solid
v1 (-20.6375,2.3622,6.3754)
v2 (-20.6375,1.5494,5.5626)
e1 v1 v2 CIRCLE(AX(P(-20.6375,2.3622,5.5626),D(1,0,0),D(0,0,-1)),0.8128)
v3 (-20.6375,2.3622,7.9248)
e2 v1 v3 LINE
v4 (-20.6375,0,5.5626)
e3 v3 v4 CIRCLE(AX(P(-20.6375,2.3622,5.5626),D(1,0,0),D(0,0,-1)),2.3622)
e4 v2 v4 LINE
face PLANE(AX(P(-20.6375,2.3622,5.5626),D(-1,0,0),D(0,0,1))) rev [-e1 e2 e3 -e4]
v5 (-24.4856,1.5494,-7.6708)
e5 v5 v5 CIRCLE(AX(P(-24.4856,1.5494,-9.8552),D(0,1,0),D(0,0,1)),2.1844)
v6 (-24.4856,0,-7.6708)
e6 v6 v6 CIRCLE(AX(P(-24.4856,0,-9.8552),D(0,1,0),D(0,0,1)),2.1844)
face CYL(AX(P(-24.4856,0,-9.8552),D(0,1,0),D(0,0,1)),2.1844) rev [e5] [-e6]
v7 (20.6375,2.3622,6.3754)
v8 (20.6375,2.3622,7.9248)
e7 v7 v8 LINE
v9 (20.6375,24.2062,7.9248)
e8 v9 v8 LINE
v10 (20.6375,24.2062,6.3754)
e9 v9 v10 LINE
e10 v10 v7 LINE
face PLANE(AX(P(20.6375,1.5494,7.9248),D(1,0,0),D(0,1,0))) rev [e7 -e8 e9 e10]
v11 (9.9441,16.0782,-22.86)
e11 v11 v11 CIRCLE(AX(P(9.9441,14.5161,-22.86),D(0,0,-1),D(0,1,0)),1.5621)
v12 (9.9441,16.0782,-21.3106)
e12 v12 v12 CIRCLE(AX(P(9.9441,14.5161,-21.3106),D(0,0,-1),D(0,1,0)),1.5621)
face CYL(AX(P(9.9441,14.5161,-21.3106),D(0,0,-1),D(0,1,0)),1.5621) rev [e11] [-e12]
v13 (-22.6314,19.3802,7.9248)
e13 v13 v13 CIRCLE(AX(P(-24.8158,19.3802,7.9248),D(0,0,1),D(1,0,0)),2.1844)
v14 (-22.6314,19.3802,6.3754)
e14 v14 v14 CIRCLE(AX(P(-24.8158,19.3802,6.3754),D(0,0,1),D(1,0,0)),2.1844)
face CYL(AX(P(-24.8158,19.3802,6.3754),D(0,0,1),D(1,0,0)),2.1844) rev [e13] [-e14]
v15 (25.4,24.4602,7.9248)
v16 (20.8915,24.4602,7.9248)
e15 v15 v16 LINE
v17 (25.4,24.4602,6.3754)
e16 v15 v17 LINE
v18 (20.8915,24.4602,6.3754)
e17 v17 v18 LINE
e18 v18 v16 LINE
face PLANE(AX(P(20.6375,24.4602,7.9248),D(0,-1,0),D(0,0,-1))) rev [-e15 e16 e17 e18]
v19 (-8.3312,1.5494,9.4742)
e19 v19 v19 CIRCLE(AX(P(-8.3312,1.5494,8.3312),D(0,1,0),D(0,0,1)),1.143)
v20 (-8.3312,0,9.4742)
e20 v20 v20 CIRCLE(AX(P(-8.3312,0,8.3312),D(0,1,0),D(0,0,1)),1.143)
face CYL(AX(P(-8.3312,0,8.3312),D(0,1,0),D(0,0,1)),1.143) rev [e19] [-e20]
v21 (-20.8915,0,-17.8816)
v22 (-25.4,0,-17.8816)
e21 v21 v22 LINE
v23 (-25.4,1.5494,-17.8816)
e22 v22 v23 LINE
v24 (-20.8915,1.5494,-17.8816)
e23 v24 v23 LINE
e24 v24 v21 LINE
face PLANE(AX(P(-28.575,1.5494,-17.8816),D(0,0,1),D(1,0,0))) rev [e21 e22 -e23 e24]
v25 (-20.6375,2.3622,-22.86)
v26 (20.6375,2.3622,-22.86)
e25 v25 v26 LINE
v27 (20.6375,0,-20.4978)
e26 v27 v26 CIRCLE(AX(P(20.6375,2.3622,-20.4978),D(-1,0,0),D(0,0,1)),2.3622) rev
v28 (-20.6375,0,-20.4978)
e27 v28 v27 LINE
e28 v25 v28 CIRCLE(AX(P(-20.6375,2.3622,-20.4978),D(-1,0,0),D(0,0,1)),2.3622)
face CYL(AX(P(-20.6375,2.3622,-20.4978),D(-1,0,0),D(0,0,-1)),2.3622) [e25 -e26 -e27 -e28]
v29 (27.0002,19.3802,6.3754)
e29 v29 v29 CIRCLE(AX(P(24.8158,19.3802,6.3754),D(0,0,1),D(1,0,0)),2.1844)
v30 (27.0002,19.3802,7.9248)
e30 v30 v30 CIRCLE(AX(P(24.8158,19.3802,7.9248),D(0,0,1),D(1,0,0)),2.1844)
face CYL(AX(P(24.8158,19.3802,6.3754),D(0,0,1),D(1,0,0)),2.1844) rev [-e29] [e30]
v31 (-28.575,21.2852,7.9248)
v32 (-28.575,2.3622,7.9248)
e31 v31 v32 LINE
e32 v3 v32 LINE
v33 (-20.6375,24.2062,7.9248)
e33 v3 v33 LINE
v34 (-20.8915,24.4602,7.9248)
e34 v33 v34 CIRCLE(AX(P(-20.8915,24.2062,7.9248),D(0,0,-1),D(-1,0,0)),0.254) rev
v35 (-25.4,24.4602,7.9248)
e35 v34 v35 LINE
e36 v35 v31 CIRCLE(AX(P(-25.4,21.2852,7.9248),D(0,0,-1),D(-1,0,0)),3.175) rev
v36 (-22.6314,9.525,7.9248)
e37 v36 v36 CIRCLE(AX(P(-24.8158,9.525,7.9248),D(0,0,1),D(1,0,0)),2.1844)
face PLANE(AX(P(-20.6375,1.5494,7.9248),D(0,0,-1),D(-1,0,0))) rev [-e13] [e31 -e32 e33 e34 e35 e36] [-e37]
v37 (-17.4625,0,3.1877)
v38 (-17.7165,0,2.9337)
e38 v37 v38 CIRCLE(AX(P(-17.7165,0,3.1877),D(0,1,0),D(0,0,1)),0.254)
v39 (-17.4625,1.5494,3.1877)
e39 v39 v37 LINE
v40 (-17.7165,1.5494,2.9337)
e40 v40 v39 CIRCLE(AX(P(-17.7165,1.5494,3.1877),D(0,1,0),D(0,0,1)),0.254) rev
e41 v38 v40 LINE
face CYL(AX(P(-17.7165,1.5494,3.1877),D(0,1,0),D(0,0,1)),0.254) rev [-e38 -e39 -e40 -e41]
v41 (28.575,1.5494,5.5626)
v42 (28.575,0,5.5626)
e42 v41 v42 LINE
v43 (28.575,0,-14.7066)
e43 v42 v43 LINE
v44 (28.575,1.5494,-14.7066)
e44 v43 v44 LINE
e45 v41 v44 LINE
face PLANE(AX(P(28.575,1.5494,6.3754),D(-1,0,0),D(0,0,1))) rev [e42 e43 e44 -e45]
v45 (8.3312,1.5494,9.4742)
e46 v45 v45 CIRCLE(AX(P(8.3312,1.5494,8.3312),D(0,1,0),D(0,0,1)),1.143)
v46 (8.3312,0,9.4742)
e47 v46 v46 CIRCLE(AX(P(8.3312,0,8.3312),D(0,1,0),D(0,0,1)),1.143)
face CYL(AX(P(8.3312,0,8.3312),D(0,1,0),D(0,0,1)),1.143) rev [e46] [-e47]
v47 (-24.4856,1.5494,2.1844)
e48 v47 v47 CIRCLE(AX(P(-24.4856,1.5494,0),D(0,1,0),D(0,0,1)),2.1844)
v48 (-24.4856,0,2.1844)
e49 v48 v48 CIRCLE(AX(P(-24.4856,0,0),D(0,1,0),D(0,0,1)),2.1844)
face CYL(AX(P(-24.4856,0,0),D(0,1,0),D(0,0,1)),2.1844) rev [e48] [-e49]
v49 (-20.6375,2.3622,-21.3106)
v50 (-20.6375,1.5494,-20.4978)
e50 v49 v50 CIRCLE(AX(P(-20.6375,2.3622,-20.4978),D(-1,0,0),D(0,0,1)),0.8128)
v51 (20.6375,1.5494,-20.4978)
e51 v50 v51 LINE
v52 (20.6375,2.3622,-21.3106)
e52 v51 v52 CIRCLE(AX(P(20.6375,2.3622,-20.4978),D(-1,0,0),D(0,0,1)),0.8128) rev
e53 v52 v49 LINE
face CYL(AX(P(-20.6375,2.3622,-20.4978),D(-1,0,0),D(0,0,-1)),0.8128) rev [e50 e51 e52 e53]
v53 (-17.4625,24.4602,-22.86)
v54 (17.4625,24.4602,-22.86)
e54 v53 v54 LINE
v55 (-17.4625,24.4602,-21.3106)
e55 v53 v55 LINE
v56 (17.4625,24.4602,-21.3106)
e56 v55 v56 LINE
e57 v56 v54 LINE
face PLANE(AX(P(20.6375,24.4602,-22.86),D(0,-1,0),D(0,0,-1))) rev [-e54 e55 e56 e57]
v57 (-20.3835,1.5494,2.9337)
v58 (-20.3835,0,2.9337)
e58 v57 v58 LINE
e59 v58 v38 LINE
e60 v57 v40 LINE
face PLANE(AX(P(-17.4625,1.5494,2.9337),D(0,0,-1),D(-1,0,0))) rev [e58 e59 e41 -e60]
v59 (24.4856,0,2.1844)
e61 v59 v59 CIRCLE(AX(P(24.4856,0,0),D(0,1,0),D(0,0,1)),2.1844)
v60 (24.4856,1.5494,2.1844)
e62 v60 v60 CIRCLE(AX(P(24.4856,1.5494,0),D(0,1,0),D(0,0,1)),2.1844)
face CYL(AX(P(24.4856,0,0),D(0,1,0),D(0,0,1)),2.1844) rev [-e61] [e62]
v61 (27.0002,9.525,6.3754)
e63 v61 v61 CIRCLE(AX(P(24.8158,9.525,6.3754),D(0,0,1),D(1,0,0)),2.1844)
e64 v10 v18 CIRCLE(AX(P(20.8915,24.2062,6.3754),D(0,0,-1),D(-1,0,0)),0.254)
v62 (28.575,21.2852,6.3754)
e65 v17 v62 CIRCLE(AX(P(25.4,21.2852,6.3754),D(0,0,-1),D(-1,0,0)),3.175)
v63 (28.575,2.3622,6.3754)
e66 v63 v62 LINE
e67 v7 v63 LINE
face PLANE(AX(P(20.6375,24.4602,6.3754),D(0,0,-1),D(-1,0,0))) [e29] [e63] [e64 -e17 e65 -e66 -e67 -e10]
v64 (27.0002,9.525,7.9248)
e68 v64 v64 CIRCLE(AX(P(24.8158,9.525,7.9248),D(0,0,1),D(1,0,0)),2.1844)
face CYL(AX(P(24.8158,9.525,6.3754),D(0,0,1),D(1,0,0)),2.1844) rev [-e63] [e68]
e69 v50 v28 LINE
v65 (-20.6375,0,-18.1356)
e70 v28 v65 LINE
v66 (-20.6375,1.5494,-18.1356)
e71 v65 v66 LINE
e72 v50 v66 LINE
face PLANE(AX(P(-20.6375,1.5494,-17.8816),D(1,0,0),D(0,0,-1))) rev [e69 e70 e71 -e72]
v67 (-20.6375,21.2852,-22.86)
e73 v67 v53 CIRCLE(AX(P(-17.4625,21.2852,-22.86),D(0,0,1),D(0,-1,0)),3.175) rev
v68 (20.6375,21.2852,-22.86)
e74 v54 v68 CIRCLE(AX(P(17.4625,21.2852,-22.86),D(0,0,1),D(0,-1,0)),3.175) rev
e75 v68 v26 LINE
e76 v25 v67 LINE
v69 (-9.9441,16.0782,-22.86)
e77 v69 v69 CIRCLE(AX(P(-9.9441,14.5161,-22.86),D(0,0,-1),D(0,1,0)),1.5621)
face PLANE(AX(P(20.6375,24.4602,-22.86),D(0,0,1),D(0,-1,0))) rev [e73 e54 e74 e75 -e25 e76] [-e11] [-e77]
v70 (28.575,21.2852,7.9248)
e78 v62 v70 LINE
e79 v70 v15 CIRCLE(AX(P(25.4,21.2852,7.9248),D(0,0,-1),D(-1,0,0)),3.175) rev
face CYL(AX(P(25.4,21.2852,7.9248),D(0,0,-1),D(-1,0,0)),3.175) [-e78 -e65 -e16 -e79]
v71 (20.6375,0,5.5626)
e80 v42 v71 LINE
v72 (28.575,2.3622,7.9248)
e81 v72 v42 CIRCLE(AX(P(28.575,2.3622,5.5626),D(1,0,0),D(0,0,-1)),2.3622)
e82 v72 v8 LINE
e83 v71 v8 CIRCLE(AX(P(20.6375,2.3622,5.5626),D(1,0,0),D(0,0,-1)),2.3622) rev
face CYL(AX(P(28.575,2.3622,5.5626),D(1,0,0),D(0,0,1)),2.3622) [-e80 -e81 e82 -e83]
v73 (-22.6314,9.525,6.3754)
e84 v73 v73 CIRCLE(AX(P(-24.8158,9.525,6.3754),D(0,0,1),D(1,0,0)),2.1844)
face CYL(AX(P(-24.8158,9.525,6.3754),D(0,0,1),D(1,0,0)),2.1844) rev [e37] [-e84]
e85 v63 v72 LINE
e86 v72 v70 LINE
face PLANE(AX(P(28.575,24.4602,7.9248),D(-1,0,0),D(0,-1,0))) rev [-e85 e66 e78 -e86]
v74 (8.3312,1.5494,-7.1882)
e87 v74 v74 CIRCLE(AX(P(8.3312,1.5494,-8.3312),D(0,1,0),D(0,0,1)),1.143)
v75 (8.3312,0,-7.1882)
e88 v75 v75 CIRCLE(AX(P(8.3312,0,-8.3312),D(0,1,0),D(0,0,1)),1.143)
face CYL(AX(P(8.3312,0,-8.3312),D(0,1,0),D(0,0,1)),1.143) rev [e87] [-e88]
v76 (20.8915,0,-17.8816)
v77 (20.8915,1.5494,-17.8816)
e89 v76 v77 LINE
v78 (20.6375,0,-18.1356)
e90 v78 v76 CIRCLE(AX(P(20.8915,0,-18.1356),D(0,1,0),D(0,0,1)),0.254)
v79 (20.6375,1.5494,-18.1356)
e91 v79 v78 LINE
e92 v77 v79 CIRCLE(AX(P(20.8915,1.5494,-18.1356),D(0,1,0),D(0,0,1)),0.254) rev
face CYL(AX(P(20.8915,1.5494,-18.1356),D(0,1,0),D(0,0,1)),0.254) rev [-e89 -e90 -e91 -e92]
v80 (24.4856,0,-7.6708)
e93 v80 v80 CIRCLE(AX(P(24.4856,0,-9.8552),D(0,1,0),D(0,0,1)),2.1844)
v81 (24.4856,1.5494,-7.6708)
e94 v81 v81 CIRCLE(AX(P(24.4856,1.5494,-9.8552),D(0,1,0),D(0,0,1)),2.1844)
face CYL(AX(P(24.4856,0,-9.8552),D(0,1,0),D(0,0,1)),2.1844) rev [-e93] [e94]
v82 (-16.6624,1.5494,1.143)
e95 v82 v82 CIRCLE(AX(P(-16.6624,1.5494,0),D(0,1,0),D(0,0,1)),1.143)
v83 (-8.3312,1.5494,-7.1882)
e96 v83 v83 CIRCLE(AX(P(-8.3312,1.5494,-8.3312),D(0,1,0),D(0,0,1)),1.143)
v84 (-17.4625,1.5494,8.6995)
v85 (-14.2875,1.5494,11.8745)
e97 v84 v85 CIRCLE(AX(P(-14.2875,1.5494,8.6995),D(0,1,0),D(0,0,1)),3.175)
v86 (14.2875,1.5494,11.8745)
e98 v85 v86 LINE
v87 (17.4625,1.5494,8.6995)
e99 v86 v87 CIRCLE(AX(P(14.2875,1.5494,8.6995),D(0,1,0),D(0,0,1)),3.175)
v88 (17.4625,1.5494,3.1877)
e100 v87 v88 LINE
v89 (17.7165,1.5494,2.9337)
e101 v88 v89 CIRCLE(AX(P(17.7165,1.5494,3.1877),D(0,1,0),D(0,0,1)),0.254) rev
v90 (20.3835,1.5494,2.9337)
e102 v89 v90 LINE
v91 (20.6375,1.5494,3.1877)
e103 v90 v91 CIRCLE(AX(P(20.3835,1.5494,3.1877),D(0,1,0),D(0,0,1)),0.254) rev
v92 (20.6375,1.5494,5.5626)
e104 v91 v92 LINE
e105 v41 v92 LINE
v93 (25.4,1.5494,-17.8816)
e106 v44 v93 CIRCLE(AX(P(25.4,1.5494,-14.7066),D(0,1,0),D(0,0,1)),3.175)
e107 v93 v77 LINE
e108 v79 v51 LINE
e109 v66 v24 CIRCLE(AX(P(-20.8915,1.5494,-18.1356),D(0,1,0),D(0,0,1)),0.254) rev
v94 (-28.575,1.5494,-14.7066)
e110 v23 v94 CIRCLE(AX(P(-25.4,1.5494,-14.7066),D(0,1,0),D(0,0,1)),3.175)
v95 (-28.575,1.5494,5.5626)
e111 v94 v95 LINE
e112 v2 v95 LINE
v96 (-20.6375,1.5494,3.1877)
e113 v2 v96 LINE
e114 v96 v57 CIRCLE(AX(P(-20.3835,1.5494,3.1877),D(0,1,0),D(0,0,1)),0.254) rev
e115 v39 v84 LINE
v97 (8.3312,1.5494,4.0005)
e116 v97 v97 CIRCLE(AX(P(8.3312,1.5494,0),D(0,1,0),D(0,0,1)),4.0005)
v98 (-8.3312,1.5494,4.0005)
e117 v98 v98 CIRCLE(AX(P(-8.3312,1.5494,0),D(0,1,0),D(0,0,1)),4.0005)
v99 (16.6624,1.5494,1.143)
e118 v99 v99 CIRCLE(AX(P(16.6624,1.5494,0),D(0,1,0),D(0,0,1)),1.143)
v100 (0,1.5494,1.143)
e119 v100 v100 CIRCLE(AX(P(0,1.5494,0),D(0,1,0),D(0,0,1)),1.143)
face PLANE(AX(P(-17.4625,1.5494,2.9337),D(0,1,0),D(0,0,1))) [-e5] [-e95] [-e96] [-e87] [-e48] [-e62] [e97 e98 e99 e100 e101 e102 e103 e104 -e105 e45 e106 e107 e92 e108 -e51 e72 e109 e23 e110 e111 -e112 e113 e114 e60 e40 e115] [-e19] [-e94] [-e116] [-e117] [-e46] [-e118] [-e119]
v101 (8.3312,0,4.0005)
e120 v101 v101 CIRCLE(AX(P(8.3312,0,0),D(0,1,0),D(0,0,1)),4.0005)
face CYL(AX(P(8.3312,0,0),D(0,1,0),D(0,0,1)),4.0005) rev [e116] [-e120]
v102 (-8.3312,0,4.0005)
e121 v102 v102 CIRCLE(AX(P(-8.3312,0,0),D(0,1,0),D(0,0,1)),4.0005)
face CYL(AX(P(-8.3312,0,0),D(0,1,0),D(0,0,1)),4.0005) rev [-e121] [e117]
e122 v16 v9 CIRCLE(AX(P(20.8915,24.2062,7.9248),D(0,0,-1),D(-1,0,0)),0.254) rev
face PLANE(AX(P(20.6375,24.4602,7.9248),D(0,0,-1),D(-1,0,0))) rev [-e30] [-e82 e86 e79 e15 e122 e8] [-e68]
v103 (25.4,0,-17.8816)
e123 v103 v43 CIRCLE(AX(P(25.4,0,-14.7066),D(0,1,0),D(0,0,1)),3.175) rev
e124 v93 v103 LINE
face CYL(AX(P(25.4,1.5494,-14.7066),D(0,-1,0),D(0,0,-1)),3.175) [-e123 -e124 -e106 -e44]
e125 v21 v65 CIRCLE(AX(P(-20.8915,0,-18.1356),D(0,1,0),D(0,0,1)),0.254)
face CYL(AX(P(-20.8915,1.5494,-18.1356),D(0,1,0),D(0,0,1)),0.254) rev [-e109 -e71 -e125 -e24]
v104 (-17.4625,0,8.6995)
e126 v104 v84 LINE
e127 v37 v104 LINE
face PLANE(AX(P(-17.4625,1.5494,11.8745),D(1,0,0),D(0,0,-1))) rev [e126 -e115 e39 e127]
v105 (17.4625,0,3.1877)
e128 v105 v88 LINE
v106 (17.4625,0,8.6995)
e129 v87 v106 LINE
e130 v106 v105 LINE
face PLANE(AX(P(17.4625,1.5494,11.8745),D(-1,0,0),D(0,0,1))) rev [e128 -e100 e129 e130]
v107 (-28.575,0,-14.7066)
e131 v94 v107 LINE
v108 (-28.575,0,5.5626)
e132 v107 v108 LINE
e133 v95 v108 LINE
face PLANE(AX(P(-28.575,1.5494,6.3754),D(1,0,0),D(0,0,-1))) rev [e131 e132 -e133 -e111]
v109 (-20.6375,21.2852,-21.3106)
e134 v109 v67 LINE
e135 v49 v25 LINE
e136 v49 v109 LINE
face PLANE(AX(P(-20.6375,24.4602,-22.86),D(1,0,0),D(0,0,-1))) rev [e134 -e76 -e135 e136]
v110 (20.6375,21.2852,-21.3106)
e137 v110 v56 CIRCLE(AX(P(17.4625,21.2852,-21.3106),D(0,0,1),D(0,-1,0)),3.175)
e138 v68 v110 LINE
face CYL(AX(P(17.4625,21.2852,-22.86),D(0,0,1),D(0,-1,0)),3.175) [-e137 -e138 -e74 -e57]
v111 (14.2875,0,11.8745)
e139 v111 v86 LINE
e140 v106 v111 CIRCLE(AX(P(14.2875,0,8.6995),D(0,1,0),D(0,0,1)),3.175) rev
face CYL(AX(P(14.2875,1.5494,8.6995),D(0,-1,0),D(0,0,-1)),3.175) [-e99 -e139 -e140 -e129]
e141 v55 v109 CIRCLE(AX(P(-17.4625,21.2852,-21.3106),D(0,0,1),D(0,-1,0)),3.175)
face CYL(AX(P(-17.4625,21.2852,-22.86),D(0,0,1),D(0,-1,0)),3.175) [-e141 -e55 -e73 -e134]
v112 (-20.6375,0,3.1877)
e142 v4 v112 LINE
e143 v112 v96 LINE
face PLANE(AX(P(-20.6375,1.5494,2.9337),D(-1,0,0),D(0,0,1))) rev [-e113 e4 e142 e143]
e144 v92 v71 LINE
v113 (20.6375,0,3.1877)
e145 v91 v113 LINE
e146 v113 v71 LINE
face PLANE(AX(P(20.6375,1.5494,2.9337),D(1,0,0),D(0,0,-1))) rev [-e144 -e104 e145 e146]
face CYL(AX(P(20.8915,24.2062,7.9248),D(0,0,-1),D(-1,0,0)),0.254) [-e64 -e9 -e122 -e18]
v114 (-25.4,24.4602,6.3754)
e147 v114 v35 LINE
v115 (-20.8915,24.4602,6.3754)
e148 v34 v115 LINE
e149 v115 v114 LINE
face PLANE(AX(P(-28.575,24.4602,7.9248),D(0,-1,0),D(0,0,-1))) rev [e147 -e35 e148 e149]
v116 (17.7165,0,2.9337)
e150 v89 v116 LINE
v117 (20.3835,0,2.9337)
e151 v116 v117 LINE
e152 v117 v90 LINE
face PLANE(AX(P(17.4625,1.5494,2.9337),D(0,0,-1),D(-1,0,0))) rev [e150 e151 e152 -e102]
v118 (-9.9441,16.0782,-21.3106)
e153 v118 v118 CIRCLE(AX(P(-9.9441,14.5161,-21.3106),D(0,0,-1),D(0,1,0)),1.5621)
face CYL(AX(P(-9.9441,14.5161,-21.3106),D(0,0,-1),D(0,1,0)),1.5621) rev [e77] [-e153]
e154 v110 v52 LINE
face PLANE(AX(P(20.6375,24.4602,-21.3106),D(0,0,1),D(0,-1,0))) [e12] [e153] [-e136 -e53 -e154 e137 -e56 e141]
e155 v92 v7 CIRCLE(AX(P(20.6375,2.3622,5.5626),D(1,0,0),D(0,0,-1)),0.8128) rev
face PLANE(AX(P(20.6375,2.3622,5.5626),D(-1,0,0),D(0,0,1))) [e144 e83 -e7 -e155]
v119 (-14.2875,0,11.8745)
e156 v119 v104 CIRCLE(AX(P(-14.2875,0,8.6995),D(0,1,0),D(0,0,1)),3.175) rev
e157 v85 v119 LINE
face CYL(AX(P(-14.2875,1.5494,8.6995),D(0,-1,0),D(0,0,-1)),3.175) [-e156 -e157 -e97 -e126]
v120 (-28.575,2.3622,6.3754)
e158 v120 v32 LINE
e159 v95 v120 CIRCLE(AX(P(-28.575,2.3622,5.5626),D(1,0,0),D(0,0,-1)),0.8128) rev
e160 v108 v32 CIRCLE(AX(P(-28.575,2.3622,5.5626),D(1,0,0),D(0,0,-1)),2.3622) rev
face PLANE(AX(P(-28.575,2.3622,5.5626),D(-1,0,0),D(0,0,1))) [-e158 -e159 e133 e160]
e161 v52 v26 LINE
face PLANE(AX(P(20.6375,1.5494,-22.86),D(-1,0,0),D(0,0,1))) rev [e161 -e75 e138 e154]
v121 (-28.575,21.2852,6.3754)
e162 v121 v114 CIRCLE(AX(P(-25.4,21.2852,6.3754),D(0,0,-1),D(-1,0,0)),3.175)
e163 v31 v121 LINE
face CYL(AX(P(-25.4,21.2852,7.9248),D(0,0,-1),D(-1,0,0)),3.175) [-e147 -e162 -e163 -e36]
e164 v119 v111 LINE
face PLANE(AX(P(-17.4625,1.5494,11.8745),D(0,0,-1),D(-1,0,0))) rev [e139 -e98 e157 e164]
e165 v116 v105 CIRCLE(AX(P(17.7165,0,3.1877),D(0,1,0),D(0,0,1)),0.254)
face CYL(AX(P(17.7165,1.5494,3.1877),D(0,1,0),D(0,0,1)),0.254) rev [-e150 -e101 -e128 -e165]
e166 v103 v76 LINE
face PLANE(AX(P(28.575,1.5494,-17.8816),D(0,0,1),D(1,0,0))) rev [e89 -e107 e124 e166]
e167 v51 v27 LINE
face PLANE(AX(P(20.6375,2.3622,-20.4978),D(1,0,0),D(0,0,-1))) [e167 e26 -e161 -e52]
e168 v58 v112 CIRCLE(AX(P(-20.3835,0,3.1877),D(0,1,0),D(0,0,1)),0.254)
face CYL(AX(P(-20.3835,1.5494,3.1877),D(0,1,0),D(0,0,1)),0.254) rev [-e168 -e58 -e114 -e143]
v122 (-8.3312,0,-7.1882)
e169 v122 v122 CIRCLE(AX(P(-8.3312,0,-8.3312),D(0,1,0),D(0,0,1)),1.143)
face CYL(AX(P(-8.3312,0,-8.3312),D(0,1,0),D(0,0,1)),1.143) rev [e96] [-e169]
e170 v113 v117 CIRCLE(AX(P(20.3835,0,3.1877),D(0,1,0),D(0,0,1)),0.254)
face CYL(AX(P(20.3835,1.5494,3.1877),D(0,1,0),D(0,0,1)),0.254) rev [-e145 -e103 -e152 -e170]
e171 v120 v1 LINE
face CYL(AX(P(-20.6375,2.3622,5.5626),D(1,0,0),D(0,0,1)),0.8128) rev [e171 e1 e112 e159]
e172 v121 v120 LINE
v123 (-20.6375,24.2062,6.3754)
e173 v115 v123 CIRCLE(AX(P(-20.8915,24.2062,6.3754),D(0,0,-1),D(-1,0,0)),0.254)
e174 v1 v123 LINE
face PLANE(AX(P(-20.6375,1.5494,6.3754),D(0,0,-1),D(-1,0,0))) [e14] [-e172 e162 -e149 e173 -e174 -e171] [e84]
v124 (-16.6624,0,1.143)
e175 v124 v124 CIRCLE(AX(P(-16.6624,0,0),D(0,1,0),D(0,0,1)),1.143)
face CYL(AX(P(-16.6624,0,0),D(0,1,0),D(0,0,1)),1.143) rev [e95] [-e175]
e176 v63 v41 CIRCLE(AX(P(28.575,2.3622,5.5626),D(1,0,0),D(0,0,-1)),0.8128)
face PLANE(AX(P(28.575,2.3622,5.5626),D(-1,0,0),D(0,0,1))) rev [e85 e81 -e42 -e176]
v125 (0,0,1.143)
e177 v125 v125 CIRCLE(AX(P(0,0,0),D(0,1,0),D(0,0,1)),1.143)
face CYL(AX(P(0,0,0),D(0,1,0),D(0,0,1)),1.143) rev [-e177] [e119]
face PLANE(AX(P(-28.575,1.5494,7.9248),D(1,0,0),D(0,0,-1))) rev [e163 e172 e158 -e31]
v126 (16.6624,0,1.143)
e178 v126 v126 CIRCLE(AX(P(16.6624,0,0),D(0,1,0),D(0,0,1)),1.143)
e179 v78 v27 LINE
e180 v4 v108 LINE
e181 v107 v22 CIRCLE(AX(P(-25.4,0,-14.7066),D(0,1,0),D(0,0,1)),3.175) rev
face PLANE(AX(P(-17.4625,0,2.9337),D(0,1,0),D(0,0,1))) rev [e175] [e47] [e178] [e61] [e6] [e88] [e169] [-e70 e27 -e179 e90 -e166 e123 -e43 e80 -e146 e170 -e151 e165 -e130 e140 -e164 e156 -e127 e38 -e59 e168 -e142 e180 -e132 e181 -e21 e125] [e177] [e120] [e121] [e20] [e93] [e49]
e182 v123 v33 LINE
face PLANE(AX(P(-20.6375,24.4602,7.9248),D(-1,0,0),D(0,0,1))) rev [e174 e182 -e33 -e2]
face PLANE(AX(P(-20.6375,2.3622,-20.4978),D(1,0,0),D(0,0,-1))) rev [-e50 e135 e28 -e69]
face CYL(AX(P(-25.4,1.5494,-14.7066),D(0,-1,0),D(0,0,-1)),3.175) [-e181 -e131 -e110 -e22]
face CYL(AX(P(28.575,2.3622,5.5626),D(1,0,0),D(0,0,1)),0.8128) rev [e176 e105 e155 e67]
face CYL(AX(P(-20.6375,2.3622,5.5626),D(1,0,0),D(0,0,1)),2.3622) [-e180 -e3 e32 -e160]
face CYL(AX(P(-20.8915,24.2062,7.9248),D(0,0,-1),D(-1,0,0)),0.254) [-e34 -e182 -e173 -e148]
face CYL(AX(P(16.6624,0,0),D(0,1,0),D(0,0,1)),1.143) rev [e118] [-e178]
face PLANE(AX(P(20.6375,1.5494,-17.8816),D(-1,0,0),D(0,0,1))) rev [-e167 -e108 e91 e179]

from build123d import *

# Parameters (mm, degrees)
BASE_FLANGE1_DEPTH             = 1.5494
EDGE_FLANGE1_STRIP_W           = 7.8232
EDGE_FLANGE1_STRIP_H           = 1.5494
EDGE_FLANGE1_STRIP_CUT_DEPTH   = 41.275
EDGE_FLANGE1_DEPTH             = 41.275
EDGE_FLANGE2_STRIP_W           = 7.8232
EDGE_FLANGE2_STRIP_H           = 1.5494
EDGE_FLANGE2_STRIP_CUT_DEPTH   = 7.9375
EDGE_FLANGE2_STRIP_2_W         = 7.8232
EDGE_FLANGE2_STRIP_2_H         = 1.5494
EDGE_FLANGE2_STRIP_CUT_2_DEPTH = 7.9375
EDGE_FLANGE2_DEPTH             = 7.9375
EDGE_FLANGE2_BEND_DEPTH        = 7.9375
SKETCH13_R                     = 1.143
SKETCH13_R_2                   = 4.0005
SKETCH13_R_3                   = 2.1844
EXTRUDE2_DEPTH                 = 1.5494
SKETCH14_R                     = 2.1844
EXTRUDE3_DEPTH                 = 1.5494
SKETCH15_R                     = 1.5621
EXTRUDE4_DEPTH                 = 1.5494
FILLET1_R                      = 3.175
FILLET2_R                      = 0.254


# Sheet-metal steps are written as plain solids
with BuildPart() as part:
    # Sketch1 → Base-Flange1 (new body)
    with BuildSketch(Plane(origin=(0, 0, 0), x_dir=(1, 0, 0), z_dir=(0, 1, 0))):
        Polygon((-17.4625, -11.8745), (17.4625, -11.8745), (17.4625, -2.9337), (20.6375, -2.9337), (20.6375, -6.3754), (28.575, -6.3754), (28.575, 17.8816), (20.6375, 17.8816), (20.6375, 21.3106), (-20.6375, 21.3106), (-20.6375, 17.8816), (-28.575, 17.8816), (-28.575, -6.3754), (-20.6375, -6.3754), (-20.6375, -2.9337), (-17.4625, -2.9337), align=None)
    extrude(amount=BASE_FLANGE1_DEPTH)

    # Edge-Flange1 strip (across the edge) → Edge-Flange1 strip cut (cut)
    with BuildSketch(Plane(origin=(20.6375, 1.5494, -21.3106), x_dir=(0, 0, 1), z_dir=(-1, 0, 0))):
        with Locations((-3.0988, -0.7747)):
            Rectangle(EDGE_FLANGE1_STRIP_W, EDGE_FLANGE1_STRIP_H)
    extrude(amount=EDGE_FLANGE1_STRIP_CUT_DEPTH, mode=Mode.SUBTRACT)

    # Edge-Flange1 section (across the edge) → Edge-Flange1 (add)
    with BuildSketch(Plane(origin=(20.6375, 1.5494, -21.3106), x_dir=(0, 0, 1), z_dir=(-1, 0, 0))):
        with BuildLine():
            Line((-1.5494, 0.8128), (-1.5494, 22.9108))
            Line((-1.5494, 22.9108), (0, 22.9108))
            Line((0, 22.9108), (0, 0.8128))
            ThreePointArc((0, 0.8128), (0.238063608, 0.238063608), (0.8128, 0))
            Line((0.8128, 0), (0.8128, -1.5494))
            ThreePointArc((0.8128, -1.5494), (-0.857527639, -0.857527639), (-1.5494, 0.8128))
        make_face()
    extrude(amount=EDGE_FLANGE1_DEPTH)

    # Edge-Flange2 strip (across the edge) → Edge-Flange2 strip cut (cut)
    with BuildSketch(Plane(origin=(-28.575, 1.5494, 6.3754), x_dir=(0, 0, -1), z_dir=(1, 0, 0))):
        with Locations((-3.0988, -0.7747)):
            Rectangle(EDGE_FLANGE2_STRIP_W, EDGE_FLANGE2_STRIP_H)
    extrude(amount=EDGE_FLANGE2_STRIP_CUT_DEPTH, mode=Mode.SUBTRACT)

    # Edge-Flange2 strip 2 (across the edge) → Edge-Flange2 strip cut 2 (cut)
    with BuildSketch(Plane(origin=(20.6375, 1.5494, 6.3754), x_dir=(0, 0, -1), z_dir=(1, 0, 0))):
        with Locations((-3.0988, -0.7747)):
            Rectangle(EDGE_FLANGE2_STRIP_2_W, EDGE_FLANGE2_STRIP_2_H)
    extrude(amount=EDGE_FLANGE2_STRIP_CUT_2_DEPTH, mode=Mode.SUBTRACT)

    # Edge-Flange2 section (across the edge) → Edge-Flange2 (add)
    with BuildSketch(Plane(origin=(-28.575, 1.5494, 6.3754), x_dir=(0, 0, -1), z_dir=(1, 0, 0))):
        with BuildLine():
            Line((-1.5494, 0.8128), (-1.5494, 22.9108))
            Line((-1.5494, 22.9108), (0, 22.9108))
            Line((0, 22.9108), (0, 0.8128))
            ThreePointArc((0, 0.8128), (0.238063608, 0.238063608), (0.8128, 0))
            Line((0.8128, 0), (0.8128, -1.5494))
            ThreePointArc((0.8128, -1.5494), (-0.857527639, -0.857527639), (-1.5494, 0.8128))
        make_face()
    extrude(amount=EDGE_FLANGE2_DEPTH)

    # Edge-Flange2 section 2 (across the edge) → Edge-Flange2 bend (add)
    with BuildSketch(Plane(origin=(20.6375, 1.5494, 6.3754), x_dir=(0, 0, -1), z_dir=(1, 0, 0))):
        with BuildLine():
            Line((-1.5494, 0.8128), (-1.5494, 22.9108))
            Line((-1.5494, 22.9108), (0, 22.9108))
            Line((0, 22.9108), (0, 0.8128))
            ThreePointArc((0, 0.8128), (0.238063608, 0.238063608), (0.8128, 0))
            Line((0.8128, 0), (0.8128, -1.5494))
            ThreePointArc((0.8128, -1.5494), (-0.857527639, -0.857527639), (-1.5494, 0.8128))
        make_face()
    extrude(amount=EDGE_FLANGE2_BEND_DEPTH)

    # Sketch13 → Extrude2 (cut)
    with BuildSketch(Plane(origin=(0, 1.5494, 0), x_dir=(1, 0, 0), z_dir=(0, 1, 0))):
        with Locations(Location((0, 0, 0), (0, 0, 270))):
            Circle(SKETCH13_R)
        with Locations(Location((8.3312, 8.3312, 0), (0, 0, 270))):
            Circle(SKETCH13_R)
        with Locations(Location((8.3312, -8.3312, 0), (0, 0, 270))):
            Circle(SKETCH13_R)
        with Locations(Location((16.6624, 0, 0), (0, 0, 270))):
            Circle(SKETCH13_R)
        with Locations(Location((-8.3312, 8.3312, 0), (0, 0, 270))):
            Circle(SKETCH13_R)
        with Locations(Location((-8.3312, -8.3312, 0), (0, 0, 270))):
            Circle(SKETCH13_R)
        with Locations(Location((-16.6624, 0, 0), (0, 0, 270))):
            Circle(SKETCH13_R)
        with Locations(Location((-8.3312, 0, 0), (0, 0, 270))):
            Circle(SKETCH13_R_2)
        with Locations(Location((8.3312, 0, 0), (0, 0, 270))):
            Circle(SKETCH13_R_2)
        with Locations(Location((-24.4856, 9.8552, 0), (0, 0, 270))):
            Circle(SKETCH13_R_3)
        with Locations(Location((-24.4856, 0, 0), (0, 0, 270))):
            Circle(SKETCH13_R_3)
        with Locations(Location((24.4856, 9.8552, 0), (0, 0, 270))):
            Circle(SKETCH13_R_3)
        with Locations(Location((24.4856, 0, 0), (0, 0, 270))):
            Circle(SKETCH13_R_3)
    extrude(amount=-EXTRUDE2_DEPTH, mode=Mode.SUBTRACT)

    # Sketch14 → Extrude3 (cut)
    with BuildSketch(Plane.XY.offset(7.9248)):
        with Locations((-24.8158, 19.3802)):
            Circle(SKETCH14_R)
        with Locations((-24.8158, 9.525)):
            Circle(SKETCH14_R)
        with Locations((24.8158, 19.3802)):
            Circle(SKETCH14_R)
        with Locations((24.8158, 9.525)):
            Circle(SKETCH14_R)
    extrude(amount=-EXTRUDE3_DEPTH, mode=Mode.SUBTRACT)

    # Sketch15 → Extrude4 (cut)
    with BuildSketch(Plane(origin=(0, 0, -22.86), x_dir=(-1, 0, 0), z_dir=(0, 0, -1))):
        with Locations(Location((-9.9441, 14.5161, 0), (0, 0, 90))):
            Circle(SKETCH15_R)
        with Locations(Location((9.9441, 14.5161, 0), (0, 0, 90))):
            Circle(SKETCH15_R)
    extrude(amount=-EXTRUDE4_DEPTH, mode=Mode.SUBTRACT)

    # Fillet1
    fillet1_edges = [part.edges().sort_by_distance(p)[0] for p in [
        (-28.575, 24.4602, 7.1501),
        (28.575, 24.4602, 7.1501),
        (-28.575, 0.7747, -17.8816),
        (28.575, 0.7747, -17.8816),
        (17.4625, 0.7747, 11.8745),
        (-17.4625, 0.7747, 11.8745),
        (20.6375, 24.4602, -22.0853),
        (-20.6375, 24.4602, -22.0853),
    ]]
    fillet(fillet1_edges, radius=FILLET1_R)

    # Fillet2
    fillet2_edges = [part.edges().sort_by_distance(p)[0] for p in [
        (-20.6375, 24.4602, 7.1501),
        (20.6375, 24.4602, 7.1501),
        (-17.4625, 0.7747, 2.9337),
        (-20.6375, 0.7747, 2.9337),
        (-20.6375, 0.7747, -17.8816),
        (20.6375, 0.7747, -17.8816),
        (20.6375, 0.7747, 2.9337),
        (17.4625, 0.7747, 2.9337),
    ]]
    fillet(fillet2_edges, radius=FILLET2_R)


solid = part.part
